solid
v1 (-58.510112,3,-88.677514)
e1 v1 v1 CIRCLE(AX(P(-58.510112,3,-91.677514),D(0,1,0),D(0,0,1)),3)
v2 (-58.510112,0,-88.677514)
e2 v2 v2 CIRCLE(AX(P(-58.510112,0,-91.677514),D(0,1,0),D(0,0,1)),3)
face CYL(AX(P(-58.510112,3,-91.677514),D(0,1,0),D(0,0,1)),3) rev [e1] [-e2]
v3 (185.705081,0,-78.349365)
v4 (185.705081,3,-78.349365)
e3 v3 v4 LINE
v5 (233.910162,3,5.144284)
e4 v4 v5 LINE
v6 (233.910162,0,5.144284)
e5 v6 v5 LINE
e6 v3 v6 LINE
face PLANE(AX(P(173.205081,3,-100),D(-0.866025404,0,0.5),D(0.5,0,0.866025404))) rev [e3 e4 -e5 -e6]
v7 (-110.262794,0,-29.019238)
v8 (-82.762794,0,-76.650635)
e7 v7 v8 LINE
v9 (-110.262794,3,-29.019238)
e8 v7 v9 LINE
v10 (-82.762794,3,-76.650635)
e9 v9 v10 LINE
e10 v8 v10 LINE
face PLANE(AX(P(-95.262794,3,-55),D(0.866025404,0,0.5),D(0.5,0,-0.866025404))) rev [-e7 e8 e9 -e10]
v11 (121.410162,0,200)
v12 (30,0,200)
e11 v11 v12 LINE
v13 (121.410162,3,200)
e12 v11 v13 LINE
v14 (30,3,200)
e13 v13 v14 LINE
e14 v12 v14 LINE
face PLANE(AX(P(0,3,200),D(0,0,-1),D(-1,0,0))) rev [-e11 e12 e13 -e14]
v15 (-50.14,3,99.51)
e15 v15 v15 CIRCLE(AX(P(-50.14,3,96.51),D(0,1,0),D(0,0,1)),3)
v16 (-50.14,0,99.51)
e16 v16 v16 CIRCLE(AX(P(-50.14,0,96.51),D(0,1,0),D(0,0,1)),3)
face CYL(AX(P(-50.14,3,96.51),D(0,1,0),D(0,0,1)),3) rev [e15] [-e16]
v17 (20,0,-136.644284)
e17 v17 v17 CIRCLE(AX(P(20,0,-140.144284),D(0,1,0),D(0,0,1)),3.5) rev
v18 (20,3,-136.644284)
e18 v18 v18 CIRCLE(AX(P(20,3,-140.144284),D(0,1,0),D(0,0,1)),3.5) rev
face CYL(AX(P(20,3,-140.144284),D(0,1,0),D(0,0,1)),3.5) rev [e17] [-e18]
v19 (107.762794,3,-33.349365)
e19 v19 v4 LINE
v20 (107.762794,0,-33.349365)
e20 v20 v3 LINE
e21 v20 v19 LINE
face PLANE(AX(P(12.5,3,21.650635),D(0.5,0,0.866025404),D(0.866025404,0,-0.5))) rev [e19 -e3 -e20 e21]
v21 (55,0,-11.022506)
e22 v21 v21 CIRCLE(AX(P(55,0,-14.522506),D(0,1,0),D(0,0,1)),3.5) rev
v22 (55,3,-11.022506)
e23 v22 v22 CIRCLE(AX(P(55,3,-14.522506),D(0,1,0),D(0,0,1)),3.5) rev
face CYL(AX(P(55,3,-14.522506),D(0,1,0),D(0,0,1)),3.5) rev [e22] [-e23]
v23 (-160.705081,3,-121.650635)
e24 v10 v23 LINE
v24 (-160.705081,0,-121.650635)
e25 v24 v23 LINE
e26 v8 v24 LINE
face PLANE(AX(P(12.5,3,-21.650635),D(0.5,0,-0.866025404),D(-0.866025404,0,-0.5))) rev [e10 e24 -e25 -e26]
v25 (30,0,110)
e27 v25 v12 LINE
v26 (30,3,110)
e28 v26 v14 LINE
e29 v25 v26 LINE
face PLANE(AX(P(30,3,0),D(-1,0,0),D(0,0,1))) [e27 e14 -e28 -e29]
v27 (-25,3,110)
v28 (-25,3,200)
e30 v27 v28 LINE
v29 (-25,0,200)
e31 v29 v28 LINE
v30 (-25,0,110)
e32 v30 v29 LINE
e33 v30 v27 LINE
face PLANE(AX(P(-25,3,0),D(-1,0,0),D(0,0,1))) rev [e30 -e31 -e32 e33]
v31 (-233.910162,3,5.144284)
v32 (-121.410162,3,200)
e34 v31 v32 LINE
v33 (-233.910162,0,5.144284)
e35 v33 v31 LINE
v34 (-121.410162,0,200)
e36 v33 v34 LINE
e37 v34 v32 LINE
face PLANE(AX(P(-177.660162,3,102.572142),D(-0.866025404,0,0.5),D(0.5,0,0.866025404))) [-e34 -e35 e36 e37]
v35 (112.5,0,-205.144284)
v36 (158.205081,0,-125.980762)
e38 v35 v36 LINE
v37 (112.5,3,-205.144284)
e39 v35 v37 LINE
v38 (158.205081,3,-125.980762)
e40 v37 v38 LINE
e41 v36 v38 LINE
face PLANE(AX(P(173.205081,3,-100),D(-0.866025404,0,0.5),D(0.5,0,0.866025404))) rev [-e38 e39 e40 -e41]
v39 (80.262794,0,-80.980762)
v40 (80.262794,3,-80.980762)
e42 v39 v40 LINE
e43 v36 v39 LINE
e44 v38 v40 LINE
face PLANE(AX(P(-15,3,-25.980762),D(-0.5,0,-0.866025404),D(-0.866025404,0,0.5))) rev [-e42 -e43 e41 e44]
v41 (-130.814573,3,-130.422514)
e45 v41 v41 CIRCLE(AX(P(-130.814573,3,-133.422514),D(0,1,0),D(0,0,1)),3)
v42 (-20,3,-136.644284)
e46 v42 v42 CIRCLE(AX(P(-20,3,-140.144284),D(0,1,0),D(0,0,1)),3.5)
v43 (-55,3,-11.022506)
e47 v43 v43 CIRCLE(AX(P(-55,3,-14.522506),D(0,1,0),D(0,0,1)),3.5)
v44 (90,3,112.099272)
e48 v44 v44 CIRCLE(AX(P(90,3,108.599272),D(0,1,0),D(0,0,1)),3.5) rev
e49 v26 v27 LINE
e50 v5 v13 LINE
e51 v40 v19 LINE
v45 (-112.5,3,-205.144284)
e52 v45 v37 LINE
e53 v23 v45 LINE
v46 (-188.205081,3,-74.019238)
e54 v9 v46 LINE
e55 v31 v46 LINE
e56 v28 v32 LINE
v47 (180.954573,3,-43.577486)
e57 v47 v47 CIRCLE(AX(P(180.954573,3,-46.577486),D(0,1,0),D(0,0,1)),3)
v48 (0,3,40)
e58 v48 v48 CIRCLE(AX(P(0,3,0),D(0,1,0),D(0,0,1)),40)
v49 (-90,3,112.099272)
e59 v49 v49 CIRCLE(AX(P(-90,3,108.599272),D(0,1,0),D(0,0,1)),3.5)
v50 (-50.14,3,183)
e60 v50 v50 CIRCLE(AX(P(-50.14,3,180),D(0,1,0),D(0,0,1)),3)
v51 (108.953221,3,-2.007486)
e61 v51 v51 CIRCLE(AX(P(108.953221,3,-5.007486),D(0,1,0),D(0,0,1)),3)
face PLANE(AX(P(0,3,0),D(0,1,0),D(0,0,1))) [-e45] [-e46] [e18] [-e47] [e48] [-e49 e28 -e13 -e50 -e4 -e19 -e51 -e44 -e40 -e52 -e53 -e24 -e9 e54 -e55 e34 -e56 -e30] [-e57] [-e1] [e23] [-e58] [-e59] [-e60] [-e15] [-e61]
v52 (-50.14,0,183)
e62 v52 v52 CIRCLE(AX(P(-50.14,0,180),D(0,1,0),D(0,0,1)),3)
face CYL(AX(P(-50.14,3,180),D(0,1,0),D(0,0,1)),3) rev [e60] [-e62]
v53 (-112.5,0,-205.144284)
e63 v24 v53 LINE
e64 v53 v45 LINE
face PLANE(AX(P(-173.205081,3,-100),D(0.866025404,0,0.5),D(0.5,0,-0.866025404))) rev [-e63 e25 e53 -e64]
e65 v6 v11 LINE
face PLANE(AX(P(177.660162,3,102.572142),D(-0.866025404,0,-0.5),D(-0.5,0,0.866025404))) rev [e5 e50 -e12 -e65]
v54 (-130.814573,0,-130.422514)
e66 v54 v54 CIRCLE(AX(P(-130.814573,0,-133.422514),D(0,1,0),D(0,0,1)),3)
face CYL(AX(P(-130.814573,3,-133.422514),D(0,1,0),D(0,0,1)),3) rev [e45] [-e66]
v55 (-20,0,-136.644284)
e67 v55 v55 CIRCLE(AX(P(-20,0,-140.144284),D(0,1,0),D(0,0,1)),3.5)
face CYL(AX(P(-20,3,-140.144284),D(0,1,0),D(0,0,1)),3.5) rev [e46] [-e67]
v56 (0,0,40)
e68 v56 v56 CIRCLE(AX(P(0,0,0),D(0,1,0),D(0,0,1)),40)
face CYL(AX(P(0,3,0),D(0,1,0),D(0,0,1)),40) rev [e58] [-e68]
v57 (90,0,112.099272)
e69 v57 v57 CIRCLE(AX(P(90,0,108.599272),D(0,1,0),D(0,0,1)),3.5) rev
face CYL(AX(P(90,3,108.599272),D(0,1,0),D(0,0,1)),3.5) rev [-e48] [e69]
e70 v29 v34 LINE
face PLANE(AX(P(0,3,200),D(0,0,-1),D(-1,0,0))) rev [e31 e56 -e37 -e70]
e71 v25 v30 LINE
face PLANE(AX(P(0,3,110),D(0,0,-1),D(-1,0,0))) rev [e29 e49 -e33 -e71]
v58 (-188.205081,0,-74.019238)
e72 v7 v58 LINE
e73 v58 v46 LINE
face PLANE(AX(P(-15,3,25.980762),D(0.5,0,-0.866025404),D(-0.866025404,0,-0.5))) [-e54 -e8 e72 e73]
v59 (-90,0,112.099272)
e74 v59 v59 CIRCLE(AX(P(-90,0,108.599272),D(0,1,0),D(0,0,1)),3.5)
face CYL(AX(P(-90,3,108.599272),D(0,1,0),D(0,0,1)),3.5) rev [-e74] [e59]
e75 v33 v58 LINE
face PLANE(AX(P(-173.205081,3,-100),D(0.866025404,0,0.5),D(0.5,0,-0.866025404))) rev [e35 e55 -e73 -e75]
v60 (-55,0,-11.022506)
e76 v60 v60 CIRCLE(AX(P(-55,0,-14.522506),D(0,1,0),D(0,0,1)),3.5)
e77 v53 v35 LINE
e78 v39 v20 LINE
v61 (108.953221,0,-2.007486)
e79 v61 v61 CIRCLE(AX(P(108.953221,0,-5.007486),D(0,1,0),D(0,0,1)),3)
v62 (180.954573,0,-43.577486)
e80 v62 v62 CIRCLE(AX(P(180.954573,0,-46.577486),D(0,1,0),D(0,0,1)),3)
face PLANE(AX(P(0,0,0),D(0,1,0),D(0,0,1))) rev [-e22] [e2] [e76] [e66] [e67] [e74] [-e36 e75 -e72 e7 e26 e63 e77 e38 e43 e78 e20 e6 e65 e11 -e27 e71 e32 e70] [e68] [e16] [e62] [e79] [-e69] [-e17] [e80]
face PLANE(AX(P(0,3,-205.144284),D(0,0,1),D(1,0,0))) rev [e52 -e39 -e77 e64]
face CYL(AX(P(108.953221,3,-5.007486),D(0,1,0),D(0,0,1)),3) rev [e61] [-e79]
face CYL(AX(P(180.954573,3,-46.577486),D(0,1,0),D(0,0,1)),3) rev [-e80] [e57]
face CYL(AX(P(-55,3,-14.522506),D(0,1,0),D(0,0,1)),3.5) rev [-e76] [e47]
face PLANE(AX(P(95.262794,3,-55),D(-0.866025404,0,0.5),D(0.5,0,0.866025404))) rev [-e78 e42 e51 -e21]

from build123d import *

# Parameters (mm, degrees)
SKETCH1_R           = 3
SKETCH1_R_2         = 3.5
SKETCH1_R_3         = 40
BOSS_EXTRUDE1_DEPTH = 3


with BuildPart() as part:
    # Sketch1 → Boss-Extrude1 (new body)
    with BuildSketch(Plane(origin=(0, 0, 0), x_dir=(1, 0, 0), z_dir=(0, 1, 0))):
        Polygon((158.205080757, 125.980762114), (112.5, 205.144284149), (-112.5, 205.144284149), (-160.705080757, 121.650635095), (-82.762794416, 76.650635095), (-95.262794416, 55), (-110.262794416, 29.019237886), (-188.205080757, 74.019237886), (-233.910161514, -5.144284149), (-121.410161514, -200), (-25, -200), (-25, -110), (0, -110), (30, -110), (30, -200), (121.410161514, -200), (233.910161514, -5.144284149), (185.705080757, 78.349364905), (107.762794416, 33.349364905), (80.262794416, 80.980762114), align=None)
        with Locations(Location((-50.14, -180, 0), (0, 0, 270))):
            Circle(SKETCH1_R, mode=Mode.SUBTRACT)
        with Locations(Location((-90, -108.599272381, 0), (0, 0, 270))):
            Circle(SKETCH1_R_2, mode=Mode.SUBTRACT)
        with Locations(Location((-50.14, -96.51, 0), (0, 0, 270))):
            Circle(SKETCH1_R, mode=Mode.SUBTRACT)
        with Locations(Location((90, -108.599272381, 0), (0, 0, 270))):
            Circle(SKETCH1_R_2, mode=Mode.SUBTRACT)
        with Locations(Location((0, 0, 0), (0, 0, 270))):
            Circle(SKETCH1_R_3, mode=Mode.SUBTRACT)
        with Locations(Location((-55, 14.522505884, 0), (0, 0, 270))):
            Circle(SKETCH1_R_2, mode=Mode.SUBTRACT)
        with Locations(Location((-58.510111719, 91.677513746, 0), (0, 0, 270))):
            Circle(SKETCH1_R, mode=Mode.SUBTRACT)
        with Locations(Location((-130.814572681, 133.422513746, 0), (0, 0, 270))):
            Circle(SKETCH1_R, mode=Mode.SUBTRACT)
        with Locations(Location((-20, 140.144284149, 0), (0, 0, 270))):
            Circle(SKETCH1_R_2, mode=Mode.SUBTRACT)
        with Locations(Location((55, 14.522505884, 0), (0, 0, 270))):
            Circle(SKETCH1_R_2, mode=Mode.SUBTRACT)
        with Locations(Location((108.953220611, 5.007486254, 0), (0, 0, 270))):
            Circle(SKETCH1_R, mode=Mode.SUBTRACT)
        with Locations(Location((180.954572681, 46.577486254, 0), (0, 0, 270))):
            Circle(SKETCH1_R, mode=Mode.SUBTRACT)
        with Locations(Location((20, 140.144284149, 0), (0, 0, 270))):
            Circle(SKETCH1_R_2, mode=Mode.SUBTRACT)
    extrude(amount=BOSS_EXTRUDE1_DEPTH)


solid = part.part
